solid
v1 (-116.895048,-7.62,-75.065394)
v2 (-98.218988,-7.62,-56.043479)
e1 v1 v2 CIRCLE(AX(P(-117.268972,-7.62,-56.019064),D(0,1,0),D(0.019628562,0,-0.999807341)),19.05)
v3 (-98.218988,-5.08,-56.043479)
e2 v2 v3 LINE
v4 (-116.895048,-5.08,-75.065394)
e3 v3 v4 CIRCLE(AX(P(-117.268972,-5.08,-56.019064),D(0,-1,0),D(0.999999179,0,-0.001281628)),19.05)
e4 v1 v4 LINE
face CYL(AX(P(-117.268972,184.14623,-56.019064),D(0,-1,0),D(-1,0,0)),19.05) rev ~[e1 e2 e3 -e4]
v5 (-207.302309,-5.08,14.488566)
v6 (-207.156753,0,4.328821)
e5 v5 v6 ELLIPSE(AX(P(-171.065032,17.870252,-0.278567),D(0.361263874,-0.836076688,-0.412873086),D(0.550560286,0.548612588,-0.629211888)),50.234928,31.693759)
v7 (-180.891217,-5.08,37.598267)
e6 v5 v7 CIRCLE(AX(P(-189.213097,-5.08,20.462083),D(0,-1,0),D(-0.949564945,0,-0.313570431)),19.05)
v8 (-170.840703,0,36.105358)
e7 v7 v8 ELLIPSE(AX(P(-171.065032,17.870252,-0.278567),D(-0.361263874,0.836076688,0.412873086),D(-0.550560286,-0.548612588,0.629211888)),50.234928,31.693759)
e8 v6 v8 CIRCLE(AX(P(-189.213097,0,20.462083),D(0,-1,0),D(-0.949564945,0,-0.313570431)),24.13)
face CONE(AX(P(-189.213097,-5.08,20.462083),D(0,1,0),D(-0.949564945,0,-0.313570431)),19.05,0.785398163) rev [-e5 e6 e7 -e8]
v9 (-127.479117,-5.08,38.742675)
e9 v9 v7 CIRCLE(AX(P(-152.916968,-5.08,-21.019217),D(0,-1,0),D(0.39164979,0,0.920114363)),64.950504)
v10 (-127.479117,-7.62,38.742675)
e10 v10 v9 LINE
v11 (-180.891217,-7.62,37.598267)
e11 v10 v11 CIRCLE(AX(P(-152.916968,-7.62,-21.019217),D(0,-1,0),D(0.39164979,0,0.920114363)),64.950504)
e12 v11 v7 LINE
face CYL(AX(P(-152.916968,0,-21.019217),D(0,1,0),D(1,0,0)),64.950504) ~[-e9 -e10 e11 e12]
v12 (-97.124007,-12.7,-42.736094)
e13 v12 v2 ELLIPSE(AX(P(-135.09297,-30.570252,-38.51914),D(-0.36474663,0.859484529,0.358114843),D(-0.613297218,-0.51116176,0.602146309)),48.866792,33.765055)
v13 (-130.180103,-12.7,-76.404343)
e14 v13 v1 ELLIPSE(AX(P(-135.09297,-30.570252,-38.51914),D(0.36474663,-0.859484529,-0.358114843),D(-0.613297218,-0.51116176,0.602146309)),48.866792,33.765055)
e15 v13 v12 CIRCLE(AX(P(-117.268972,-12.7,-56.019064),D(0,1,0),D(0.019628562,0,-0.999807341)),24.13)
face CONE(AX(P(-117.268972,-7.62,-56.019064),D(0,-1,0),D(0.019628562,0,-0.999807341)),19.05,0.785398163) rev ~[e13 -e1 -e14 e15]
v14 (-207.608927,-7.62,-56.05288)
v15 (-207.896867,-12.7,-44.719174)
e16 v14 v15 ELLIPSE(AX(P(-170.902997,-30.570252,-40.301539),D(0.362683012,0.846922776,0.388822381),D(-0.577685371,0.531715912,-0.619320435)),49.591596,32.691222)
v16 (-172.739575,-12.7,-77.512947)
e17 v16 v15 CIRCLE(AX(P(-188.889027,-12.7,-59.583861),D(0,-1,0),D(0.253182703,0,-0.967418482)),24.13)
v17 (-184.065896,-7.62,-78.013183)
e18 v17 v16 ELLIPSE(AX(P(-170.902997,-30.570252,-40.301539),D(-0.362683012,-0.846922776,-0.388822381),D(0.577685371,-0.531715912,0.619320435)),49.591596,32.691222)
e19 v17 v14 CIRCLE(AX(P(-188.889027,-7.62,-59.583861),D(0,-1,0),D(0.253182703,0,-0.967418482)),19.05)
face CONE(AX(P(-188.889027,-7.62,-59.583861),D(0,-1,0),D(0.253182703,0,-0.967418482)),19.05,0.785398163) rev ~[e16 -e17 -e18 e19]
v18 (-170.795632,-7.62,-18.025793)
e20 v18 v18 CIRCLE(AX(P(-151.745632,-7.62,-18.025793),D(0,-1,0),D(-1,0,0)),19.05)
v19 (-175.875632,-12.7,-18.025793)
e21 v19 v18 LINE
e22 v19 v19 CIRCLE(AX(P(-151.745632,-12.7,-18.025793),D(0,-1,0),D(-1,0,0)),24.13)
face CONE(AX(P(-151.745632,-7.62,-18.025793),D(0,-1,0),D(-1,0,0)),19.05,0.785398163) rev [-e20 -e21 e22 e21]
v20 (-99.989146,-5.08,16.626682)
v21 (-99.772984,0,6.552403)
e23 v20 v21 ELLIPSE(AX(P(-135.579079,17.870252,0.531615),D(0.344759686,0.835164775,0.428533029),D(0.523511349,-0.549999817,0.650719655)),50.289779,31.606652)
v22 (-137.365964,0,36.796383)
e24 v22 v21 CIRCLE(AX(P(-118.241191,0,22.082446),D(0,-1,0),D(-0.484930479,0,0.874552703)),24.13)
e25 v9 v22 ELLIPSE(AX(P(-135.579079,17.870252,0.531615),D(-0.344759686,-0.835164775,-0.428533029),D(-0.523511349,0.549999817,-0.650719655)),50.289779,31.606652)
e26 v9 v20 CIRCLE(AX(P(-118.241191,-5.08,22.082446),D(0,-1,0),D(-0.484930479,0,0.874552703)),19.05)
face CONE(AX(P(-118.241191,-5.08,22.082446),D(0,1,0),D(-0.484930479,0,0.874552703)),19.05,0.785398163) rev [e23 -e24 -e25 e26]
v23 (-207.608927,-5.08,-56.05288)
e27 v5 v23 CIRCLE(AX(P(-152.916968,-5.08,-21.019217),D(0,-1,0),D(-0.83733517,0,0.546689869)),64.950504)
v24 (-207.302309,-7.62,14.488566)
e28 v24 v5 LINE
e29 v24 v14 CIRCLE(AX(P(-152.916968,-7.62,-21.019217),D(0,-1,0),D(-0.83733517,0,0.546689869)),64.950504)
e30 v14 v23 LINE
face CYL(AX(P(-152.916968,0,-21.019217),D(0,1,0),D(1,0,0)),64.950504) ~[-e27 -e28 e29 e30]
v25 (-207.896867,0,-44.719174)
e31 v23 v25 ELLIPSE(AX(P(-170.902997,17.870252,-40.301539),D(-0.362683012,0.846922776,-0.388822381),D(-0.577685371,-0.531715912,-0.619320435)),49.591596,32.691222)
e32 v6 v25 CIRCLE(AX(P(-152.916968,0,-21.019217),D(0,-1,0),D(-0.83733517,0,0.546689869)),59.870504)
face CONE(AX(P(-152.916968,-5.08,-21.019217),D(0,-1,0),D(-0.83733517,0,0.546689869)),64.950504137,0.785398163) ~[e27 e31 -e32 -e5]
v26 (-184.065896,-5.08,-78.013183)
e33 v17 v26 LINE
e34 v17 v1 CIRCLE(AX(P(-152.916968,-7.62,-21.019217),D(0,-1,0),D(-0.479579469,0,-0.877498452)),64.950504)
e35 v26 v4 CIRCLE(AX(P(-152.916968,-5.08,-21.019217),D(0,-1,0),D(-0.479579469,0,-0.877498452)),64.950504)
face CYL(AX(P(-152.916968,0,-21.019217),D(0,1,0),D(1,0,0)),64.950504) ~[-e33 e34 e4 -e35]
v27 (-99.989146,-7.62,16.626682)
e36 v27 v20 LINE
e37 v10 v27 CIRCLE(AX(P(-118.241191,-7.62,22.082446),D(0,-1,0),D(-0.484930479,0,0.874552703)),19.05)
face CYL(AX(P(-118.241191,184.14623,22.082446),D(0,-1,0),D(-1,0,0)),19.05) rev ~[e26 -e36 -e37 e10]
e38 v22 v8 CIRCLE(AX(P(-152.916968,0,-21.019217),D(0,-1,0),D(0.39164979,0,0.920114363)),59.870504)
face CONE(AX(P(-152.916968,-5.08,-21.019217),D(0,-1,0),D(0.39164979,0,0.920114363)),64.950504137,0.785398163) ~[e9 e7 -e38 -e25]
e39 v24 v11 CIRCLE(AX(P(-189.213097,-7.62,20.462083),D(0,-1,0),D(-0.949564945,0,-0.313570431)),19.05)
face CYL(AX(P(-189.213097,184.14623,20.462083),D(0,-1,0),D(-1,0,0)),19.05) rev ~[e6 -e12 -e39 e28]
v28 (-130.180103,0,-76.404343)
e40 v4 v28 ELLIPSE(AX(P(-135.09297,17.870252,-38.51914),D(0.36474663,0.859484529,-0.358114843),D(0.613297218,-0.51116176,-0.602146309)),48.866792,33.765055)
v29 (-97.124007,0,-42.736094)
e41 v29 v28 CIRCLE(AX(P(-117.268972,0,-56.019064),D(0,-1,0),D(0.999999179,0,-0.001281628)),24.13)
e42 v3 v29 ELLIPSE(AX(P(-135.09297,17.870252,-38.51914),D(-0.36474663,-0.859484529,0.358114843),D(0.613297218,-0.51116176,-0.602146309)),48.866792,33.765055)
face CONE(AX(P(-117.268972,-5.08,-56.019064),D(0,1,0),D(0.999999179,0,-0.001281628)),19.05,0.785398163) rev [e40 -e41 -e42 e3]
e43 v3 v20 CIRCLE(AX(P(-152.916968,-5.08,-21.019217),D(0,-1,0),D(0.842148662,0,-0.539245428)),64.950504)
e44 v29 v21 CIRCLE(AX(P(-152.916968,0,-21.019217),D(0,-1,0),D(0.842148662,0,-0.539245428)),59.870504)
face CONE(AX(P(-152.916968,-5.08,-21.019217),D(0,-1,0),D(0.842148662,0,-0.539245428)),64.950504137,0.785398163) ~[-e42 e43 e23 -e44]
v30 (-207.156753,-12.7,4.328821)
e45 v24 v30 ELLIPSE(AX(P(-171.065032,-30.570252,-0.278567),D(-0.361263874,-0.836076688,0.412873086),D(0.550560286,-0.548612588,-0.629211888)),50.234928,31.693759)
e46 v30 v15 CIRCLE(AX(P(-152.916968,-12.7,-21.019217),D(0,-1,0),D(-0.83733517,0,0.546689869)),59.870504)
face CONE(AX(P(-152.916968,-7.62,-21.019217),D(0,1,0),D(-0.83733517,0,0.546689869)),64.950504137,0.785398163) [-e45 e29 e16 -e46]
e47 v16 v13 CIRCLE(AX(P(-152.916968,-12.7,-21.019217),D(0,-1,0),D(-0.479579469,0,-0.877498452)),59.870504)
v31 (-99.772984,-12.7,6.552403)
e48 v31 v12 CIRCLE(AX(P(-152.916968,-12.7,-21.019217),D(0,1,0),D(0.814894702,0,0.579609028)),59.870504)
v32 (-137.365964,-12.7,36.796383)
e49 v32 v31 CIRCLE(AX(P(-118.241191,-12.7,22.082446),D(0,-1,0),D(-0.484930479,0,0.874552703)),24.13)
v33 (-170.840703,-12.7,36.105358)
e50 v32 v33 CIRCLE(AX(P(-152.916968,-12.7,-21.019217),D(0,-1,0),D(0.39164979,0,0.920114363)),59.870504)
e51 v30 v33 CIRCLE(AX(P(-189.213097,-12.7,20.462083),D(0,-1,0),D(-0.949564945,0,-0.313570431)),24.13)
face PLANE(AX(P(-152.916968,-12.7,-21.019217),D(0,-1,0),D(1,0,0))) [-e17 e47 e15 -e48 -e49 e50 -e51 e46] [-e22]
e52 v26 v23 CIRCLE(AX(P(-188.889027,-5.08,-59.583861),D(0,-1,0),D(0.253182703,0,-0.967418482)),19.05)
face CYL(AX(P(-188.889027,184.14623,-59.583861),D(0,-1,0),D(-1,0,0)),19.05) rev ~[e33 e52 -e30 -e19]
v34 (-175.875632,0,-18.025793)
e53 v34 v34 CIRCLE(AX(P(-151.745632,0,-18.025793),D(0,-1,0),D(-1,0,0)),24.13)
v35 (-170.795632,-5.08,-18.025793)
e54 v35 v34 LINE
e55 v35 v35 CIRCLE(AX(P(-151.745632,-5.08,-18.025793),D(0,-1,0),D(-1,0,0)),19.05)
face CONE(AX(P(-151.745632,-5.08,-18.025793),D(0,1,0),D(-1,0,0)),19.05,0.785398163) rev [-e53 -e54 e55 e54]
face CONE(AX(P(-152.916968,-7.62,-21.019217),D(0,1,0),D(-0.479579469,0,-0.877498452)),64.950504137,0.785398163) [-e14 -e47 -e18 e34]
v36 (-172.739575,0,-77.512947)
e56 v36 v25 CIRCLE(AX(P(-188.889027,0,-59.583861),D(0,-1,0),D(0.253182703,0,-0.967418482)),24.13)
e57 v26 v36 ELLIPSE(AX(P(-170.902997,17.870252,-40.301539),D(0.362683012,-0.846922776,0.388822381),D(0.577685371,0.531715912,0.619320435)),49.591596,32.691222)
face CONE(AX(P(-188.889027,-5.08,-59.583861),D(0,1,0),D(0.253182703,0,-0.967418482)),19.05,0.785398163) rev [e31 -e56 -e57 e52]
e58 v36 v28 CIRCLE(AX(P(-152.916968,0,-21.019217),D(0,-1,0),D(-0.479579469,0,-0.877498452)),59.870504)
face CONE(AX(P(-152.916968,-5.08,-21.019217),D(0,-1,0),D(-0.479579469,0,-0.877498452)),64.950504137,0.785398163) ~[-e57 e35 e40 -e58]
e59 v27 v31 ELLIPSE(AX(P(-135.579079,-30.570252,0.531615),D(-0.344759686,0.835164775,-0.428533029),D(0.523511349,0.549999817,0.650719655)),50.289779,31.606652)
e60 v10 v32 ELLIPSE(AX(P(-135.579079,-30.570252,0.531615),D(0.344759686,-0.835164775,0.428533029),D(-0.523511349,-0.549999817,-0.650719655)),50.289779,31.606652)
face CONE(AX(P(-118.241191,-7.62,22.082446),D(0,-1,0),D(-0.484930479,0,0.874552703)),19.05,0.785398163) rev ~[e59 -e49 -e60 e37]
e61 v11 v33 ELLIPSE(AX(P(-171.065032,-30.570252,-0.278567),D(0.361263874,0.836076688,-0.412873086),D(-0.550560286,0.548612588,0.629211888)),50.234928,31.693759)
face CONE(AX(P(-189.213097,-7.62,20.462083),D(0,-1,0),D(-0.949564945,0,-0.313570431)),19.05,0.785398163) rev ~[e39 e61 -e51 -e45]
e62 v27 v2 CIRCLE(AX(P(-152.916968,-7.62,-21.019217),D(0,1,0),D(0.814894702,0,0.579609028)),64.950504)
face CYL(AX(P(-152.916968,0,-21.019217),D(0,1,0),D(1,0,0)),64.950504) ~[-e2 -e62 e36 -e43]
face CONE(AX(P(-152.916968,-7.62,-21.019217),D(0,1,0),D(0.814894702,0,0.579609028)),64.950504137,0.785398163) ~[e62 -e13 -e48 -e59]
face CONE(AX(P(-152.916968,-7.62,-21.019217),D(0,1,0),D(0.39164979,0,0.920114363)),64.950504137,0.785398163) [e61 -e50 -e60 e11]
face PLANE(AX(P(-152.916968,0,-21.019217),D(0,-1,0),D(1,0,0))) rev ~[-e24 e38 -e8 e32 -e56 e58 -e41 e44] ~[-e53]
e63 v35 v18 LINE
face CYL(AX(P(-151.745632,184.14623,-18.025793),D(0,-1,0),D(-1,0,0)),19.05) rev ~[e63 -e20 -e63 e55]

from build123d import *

# Parameters (mm, degrees)
F0_R     = 64.9505041371
F1_DEPTH = 12.7
F3_D     = 38.1
F4_SIZE  = 5.08


with BuildPart() as f1:
    # F0 (on Front) → F1 (new body)
    with BuildSketch(Plane.XZ):
        with Locations((-152.9169678688, -21.0192166269)):
            Circle(F0_R)
    extrude(amount=F1_DEPTH)

    # F3 (through all)
    with Locations(Plane(origin=(0, 0, 0), x_dir=(1, 0, 0), z_dir=(0, 1, 0))):
        with Locations((-151.7456322908, 18.0257931352), (-118.2411909103, -22.082446143), (-189.2130970955, -20.4620826989), (-188.8890266418, 59.5838613808), (-117.2689720988, 56.019064039)):
            Hole(F3_D / 2)

    # F4
    f4_edges = [f1.edges().sort_by_distance(p)[0] for p in [
        (-130.862366, -12.7, -42.672824),
        (-87.985724, -12.7, -19.437569),
        (-130.182417, -12.7, 7.239615),
        (-154.308279, -12.7, 43.916384),
        (-176.668586, -12.7, 6.125495),
        (-217.866858, -12.7, -20.736903),
        (-175.895036, -12.7, -45.653365),
        (-150.069359, -12.7, -85.907267),
        (-170.795632, -12.7, -18.025793),
        (-87.985724, 0, -19.437569),
        (-130.182417, 0, 7.239615),
        (-154.308279, 0, 43.916384),
        (-176.668586, 0, 6.125495),
        (-217.866858, 0, -20.736903),
        (-175.895036, 0, -45.653365),
        (-150.069359, 0, -85.907267),
        (-130.862366, 0, -42.672824),
        (-170.795632, 0, -18.025793),
    ]]
    chamfer(f4_edges, length=F4_SIZE)


solid = f1.part
